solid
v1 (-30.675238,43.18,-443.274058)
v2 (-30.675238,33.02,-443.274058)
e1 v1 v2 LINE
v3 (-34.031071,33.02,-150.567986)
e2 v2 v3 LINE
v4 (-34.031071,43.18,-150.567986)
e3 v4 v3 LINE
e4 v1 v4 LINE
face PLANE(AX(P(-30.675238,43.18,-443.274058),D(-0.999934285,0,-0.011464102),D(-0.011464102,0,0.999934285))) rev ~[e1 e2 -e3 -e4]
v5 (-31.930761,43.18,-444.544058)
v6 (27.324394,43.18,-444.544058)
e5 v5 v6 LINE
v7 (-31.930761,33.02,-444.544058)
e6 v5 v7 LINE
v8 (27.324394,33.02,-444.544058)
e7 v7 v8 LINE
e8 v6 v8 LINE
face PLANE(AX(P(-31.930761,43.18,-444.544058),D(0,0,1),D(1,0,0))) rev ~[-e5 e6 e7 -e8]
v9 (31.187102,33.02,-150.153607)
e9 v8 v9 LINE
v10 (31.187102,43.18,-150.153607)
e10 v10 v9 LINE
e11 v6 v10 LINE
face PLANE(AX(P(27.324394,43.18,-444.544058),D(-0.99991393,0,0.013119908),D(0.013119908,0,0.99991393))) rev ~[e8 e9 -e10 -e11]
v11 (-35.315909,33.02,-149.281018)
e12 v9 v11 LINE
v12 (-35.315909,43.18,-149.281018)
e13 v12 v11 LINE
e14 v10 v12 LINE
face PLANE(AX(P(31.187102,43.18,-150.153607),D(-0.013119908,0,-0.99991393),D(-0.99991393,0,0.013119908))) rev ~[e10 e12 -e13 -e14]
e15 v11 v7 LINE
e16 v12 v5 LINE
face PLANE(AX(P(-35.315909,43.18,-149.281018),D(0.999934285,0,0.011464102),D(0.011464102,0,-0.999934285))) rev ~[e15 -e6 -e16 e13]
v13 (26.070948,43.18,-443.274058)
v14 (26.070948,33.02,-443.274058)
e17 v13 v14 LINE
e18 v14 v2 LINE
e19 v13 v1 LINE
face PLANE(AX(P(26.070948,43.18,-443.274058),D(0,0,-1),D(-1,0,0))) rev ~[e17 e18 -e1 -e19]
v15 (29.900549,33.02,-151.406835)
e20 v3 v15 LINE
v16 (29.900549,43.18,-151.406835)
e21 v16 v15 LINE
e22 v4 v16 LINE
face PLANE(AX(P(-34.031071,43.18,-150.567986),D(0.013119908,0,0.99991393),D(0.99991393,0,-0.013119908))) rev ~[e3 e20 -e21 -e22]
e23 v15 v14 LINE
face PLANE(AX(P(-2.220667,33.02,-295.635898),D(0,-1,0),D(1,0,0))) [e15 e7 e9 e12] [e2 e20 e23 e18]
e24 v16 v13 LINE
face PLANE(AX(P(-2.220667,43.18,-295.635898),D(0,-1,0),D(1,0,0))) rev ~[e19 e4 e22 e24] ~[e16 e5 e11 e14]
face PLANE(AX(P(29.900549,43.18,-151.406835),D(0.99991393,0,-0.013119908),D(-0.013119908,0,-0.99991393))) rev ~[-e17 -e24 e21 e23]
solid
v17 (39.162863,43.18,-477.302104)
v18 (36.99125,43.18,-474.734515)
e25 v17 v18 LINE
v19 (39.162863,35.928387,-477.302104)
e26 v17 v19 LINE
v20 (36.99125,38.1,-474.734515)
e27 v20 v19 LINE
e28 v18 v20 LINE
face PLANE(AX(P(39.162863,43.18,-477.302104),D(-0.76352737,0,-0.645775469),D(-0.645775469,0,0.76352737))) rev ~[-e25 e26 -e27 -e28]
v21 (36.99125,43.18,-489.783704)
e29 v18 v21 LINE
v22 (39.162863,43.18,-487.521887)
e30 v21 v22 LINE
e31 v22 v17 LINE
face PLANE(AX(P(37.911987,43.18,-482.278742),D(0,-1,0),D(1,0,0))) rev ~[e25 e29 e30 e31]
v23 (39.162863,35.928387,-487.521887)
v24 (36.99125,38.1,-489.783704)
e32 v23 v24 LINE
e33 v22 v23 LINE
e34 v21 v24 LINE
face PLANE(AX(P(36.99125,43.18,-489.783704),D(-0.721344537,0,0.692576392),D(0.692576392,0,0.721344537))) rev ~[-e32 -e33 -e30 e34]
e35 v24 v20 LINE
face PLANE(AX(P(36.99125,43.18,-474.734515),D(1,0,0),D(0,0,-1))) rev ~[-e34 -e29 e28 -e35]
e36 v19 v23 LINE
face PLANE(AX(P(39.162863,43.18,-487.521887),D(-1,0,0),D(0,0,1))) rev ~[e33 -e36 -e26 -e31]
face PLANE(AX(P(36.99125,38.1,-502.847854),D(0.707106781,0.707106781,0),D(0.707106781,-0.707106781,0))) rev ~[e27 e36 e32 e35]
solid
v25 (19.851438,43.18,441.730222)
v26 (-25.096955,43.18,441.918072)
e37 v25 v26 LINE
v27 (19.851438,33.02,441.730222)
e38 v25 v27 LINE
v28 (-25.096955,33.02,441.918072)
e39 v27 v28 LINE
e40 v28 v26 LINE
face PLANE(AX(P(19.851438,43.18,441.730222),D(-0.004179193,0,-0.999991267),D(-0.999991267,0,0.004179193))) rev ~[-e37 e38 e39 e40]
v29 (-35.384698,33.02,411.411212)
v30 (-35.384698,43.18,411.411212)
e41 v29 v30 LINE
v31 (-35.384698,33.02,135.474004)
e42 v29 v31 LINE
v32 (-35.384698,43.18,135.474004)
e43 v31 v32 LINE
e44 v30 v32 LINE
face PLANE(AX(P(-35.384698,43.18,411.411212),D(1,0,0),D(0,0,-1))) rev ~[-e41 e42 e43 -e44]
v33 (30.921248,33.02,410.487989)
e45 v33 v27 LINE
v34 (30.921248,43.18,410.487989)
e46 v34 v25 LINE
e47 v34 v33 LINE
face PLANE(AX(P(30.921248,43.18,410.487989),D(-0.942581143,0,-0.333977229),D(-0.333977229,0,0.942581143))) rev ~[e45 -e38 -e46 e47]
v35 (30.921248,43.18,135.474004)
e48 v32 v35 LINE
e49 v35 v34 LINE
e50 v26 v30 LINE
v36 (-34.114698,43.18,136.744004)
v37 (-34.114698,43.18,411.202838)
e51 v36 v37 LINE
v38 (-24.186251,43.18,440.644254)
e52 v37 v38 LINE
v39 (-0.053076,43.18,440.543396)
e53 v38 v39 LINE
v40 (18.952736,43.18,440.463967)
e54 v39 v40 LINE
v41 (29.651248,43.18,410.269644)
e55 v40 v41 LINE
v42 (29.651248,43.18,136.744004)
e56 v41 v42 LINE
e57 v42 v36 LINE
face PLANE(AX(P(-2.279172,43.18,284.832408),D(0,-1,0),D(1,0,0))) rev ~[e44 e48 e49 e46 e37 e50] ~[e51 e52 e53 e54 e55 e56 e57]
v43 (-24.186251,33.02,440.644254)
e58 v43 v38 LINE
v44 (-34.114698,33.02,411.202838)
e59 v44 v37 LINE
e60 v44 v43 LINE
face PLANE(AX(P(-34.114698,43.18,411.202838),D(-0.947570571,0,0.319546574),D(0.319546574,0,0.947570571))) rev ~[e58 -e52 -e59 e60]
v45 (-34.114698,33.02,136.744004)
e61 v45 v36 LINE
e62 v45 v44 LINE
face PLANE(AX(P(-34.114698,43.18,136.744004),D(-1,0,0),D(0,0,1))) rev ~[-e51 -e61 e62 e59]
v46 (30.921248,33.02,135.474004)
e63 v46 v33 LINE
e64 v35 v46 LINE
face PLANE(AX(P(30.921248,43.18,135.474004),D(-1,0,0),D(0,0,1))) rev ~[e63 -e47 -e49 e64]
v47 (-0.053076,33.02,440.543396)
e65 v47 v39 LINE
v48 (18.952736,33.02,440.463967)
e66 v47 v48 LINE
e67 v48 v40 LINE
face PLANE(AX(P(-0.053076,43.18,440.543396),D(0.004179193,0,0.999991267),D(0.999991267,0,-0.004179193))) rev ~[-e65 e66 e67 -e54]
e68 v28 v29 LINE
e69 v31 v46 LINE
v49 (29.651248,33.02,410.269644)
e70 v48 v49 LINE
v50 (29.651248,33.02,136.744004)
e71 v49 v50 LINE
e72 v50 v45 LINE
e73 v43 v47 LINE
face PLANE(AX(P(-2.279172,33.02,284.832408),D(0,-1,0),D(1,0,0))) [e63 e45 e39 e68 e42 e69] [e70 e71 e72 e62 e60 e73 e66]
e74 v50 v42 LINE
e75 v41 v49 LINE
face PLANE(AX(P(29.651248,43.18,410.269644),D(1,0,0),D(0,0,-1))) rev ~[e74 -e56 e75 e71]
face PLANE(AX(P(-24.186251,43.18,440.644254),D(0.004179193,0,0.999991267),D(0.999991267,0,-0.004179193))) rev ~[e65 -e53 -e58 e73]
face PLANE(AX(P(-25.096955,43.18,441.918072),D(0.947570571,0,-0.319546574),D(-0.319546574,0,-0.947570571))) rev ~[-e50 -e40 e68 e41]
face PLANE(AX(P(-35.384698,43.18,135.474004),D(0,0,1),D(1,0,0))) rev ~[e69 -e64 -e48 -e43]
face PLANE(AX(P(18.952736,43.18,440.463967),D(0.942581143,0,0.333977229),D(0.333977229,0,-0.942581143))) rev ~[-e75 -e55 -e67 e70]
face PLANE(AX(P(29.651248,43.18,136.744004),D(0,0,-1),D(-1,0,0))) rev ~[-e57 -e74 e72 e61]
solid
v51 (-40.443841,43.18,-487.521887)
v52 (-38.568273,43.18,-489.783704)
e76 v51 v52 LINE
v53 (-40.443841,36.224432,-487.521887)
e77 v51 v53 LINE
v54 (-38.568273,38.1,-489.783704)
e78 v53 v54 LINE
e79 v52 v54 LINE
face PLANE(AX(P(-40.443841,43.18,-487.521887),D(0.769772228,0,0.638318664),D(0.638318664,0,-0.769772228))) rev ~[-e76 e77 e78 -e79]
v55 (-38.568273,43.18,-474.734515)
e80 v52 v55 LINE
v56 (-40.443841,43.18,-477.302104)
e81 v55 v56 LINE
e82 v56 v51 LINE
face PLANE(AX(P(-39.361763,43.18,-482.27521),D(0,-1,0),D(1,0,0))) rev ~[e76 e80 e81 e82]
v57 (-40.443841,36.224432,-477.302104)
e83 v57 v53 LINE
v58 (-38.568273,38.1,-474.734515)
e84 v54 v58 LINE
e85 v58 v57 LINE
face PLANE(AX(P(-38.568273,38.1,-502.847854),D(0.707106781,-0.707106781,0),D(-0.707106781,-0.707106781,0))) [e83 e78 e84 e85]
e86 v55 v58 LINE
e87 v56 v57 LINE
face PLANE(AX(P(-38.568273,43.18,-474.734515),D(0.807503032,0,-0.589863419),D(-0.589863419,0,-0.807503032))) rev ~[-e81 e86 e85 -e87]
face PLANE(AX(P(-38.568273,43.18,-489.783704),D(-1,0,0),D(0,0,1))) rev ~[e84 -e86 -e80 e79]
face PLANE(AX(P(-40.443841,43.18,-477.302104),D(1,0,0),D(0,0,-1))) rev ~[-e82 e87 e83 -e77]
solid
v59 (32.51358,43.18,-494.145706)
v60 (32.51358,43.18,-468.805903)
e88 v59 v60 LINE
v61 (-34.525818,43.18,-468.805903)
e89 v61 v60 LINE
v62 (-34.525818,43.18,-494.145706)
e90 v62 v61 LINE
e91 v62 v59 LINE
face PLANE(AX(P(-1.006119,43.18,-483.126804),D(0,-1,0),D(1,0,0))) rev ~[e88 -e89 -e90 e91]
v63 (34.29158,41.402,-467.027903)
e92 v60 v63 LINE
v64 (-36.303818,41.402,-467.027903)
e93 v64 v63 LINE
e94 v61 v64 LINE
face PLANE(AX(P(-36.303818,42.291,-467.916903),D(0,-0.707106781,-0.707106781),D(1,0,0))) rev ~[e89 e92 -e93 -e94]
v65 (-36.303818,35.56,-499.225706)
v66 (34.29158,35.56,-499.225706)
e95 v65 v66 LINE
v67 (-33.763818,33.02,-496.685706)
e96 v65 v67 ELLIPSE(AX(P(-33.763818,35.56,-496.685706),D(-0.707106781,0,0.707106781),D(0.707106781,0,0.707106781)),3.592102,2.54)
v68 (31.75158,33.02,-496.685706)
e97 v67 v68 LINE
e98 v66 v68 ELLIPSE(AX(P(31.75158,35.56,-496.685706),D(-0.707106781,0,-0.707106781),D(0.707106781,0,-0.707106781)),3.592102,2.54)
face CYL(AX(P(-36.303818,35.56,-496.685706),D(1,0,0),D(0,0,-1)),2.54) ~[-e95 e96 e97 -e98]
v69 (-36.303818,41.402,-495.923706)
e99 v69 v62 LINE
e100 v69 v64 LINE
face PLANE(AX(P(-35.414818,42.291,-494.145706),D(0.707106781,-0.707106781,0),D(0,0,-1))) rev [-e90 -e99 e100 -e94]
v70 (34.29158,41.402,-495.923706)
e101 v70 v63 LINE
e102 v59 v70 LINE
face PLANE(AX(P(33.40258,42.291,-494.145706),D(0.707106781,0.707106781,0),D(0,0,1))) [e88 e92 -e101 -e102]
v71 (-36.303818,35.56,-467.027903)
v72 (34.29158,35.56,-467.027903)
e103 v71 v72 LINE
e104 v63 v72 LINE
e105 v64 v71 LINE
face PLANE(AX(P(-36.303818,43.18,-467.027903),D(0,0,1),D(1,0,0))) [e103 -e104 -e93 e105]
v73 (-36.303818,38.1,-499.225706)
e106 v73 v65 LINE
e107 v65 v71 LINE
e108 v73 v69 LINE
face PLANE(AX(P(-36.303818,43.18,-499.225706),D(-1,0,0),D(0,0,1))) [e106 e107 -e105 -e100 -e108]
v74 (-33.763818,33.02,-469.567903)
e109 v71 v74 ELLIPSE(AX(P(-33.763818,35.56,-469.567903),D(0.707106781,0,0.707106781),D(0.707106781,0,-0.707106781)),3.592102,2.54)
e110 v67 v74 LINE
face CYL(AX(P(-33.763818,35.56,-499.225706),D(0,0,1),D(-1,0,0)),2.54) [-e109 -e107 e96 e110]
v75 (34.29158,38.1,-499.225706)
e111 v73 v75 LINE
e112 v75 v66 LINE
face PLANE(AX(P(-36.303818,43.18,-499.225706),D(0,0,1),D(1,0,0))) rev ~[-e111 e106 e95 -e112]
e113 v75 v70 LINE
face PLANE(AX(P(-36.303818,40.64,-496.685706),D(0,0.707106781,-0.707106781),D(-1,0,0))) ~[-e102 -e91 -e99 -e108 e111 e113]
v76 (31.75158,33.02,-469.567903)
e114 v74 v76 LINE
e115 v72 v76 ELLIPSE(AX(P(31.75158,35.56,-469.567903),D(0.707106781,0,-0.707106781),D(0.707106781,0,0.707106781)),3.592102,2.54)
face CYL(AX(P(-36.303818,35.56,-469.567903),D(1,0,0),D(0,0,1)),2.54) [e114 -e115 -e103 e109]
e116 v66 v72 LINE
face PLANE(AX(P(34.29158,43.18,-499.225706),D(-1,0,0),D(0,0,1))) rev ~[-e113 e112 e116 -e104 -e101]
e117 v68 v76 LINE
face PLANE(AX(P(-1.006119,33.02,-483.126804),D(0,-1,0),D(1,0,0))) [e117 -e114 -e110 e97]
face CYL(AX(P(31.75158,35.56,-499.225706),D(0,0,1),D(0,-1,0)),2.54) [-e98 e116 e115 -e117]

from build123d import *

# Parameters (mm, degrees)
F3_DEPTH       = 10.16
F5_DEPTH       = 10.16
F6_DEPTH       = 3.048
F7_W           = 70.5953985453
F7_H           = 32.1978032589
F8_DEPTH       = 10.16
F9_SIZE        = 5.08
F10_SIZE       = 1.778
F11_R          = 2.54
F12_T1_DEPTH   = 41.1774884869
F12_2_T1_DEPTH = 41.1774884869


# Not quite as in the source:
# - a fillet or chamfer that OpenCascade refuses, or shapes differently, is made with other operations: its cross-section is extruded or revolved along the edge and cut away or added


with BuildPart() as f3:
    # F2 (on offset) → F3 (new body)
    with BuildSketch(Plane.XZ.offset(-43.18)):
        Polygon((-35.3846980661, 135.4740036093), (30.9212480387, 135.4740036093), (30.9212480387, 410.4879885195), (19.851437657, 441.7302218888), (-0.0477681745, 441.8133852342), (-25.0969552653, 441.9180715325), (-35.3846980661, 411.4112124139), align=None)
        Polygon((29.6512480387, 410.2696444457), (29.6512480387, 136.7440036093), (-34.1146980661, 136.7440036093), (-34.1146980661, 411.2028378599), (-24.1862514864, 440.6442544017), (-0.0530757494, 440.5433963249), (18.9527356185, 440.46396668), align=None, mode=Mode.SUBTRACT)
    extrude(amount=F3_DEPTH)

    # F2 (on offset) → F6 (join)
    with BuildSketch(Plane.XZ.offset(-43.18)):
        Polygon((-35.3846980661, 135.4740036093), (30.9212480387, 135.4740036093), (30.9212480387, 410.4879885195), (19.851437657, 441.7302218888), (-0.0477681745, 441.8133852342), (-25.0969552653, 441.9180715325), (-35.3846980661, 411.4112124139), align=None)
        Polygon((29.6512480387, 410.2696444457), (29.6512480387, 136.7440036093), (-34.1146980661, 136.7440036093), (-34.1146980661, 411.2028378599), (-24.1862514864, 440.6442544017), (-0.0530757494, 440.5433963249), (18.9527356185, 440.46396668), align=None, mode=Mode.SUBTRACT)
    extrude(amount=F6_DEPTH)


with BuildPart() as f5:
    # F4 (on offset) → F5 (new body)
    with BuildSketch(Plane.XZ.offset(-43.18)):
        Polygon((27.3243936069, -444.5440577507), (31.1871017119, -150.1536065675), (-35.3159089358, -149.281018081), (-31.9307609946, -444.5440577507), (0.0040204088, -444.5440577507), align=None)
        Polygon((0.0040204088, -443.2740577507), (-30.6752378969, -443.2740577507), (-34.0310705739, -150.567985811), (29.9005487372, -151.4068349758), (26.0709480064, -443.2740577507), align=None, mode=Mode.SUBTRACT)
    extrude(amount=F5_DEPTH)


with BuildPart() as f8:
    # F7 (on offset) → F8 (new body)
    with BuildSketch(Plane.XZ.offset(-43.18)):
        with Locations((-1.0061189532, -483.1268042326)):
            Rectangle(F7_W, F7_H)
    extrude(amount=F8_DEPTH)

    # F9
    f9_edges = [f8.edges().sort_by_distance(p)[0] for p in [
        (-1.006119, 43.18, -499.225706),
    ]]
    chamfer(f9_edges, length=F9_SIZE)

    # F10
    f10_edges = [f8.edges().sort_by_distance(p)[0] for p in [
        (34.29158, 43.18, -480.586804),
        (-1.006119, 43.18, -467.027903),
        (-36.303818, 43.18, -480.586804),
    ]]
    chamfer(f10_edges, length=F10_SIZE)

    # F11
    f11_edges = [f8.edges().sort_by_distance(p)[0] for p in [
        (-1.006119, 33.02, -467.027903),
        (-36.303818, 33.02, -483.126804),
        (-1.006119, 33.02, -499.225706),
        (34.29158, 33.02, -483.126804),
    ]]
    fillet(f11_edges, radius=F11_R)


with BuildPart() as f8b:
    # F7 (on offset) → F8, piece 2 (new body)
    with BuildSketch(Plane.XZ.offset(-43.18)):
        Polygon((-38.5682731867, -489.7837042809), (-38.5682731867, -474.7345149517), (-40.443841368, -477.3021042347), (-40.443841368, -487.5218868256), align=None)
    extrude(amount=F8_DEPTH)

    # F12#2: chamfer of 5.08 on 1 edges, made by hand

    # F12_2_s2 → F12_2_t1 (cut)
    with BuildSketch(Plane.XY.offset(-502.8478538597)):
        Polygon((-38.5682731867, 38.1), (-43.6482731867, 33.02), (-38.5682731867, 33.02), align=None)
    extrude(amount=F12_2_T1_DEPTH, mode=Mode.SUBTRACT)


with BuildPart() as f8c:
    # F7 (on offset) → F8, piece 3 (new body)
    with BuildSketch(Plane.XZ.offset(-43.18)):
        Polygon((36.9912497699, -474.7345149517), (36.9912497699, -489.7837042809), (39.1628630459, -487.5218868256), (39.1628630459, -477.3021042347), align=None)
    extrude(amount=F8_DEPTH)

    # F12: chamfer of 5.08 on 1 edges, made by hand

    # F12_s2 → F12_t1 (cut)
    with BuildSketch(Plane.XY.offset(-502.8478538597)):
        Polygon((36.9912497699, 38.1), (42.0712497699, 33.02), (36.9912497699, 33.02), align=None)
    extrude(amount=F12_T1_DEPTH, mode=Mode.SUBTRACT)


solid = Compound([f3.part, f5.part, f8.part, f8b.part, f8c.part])
